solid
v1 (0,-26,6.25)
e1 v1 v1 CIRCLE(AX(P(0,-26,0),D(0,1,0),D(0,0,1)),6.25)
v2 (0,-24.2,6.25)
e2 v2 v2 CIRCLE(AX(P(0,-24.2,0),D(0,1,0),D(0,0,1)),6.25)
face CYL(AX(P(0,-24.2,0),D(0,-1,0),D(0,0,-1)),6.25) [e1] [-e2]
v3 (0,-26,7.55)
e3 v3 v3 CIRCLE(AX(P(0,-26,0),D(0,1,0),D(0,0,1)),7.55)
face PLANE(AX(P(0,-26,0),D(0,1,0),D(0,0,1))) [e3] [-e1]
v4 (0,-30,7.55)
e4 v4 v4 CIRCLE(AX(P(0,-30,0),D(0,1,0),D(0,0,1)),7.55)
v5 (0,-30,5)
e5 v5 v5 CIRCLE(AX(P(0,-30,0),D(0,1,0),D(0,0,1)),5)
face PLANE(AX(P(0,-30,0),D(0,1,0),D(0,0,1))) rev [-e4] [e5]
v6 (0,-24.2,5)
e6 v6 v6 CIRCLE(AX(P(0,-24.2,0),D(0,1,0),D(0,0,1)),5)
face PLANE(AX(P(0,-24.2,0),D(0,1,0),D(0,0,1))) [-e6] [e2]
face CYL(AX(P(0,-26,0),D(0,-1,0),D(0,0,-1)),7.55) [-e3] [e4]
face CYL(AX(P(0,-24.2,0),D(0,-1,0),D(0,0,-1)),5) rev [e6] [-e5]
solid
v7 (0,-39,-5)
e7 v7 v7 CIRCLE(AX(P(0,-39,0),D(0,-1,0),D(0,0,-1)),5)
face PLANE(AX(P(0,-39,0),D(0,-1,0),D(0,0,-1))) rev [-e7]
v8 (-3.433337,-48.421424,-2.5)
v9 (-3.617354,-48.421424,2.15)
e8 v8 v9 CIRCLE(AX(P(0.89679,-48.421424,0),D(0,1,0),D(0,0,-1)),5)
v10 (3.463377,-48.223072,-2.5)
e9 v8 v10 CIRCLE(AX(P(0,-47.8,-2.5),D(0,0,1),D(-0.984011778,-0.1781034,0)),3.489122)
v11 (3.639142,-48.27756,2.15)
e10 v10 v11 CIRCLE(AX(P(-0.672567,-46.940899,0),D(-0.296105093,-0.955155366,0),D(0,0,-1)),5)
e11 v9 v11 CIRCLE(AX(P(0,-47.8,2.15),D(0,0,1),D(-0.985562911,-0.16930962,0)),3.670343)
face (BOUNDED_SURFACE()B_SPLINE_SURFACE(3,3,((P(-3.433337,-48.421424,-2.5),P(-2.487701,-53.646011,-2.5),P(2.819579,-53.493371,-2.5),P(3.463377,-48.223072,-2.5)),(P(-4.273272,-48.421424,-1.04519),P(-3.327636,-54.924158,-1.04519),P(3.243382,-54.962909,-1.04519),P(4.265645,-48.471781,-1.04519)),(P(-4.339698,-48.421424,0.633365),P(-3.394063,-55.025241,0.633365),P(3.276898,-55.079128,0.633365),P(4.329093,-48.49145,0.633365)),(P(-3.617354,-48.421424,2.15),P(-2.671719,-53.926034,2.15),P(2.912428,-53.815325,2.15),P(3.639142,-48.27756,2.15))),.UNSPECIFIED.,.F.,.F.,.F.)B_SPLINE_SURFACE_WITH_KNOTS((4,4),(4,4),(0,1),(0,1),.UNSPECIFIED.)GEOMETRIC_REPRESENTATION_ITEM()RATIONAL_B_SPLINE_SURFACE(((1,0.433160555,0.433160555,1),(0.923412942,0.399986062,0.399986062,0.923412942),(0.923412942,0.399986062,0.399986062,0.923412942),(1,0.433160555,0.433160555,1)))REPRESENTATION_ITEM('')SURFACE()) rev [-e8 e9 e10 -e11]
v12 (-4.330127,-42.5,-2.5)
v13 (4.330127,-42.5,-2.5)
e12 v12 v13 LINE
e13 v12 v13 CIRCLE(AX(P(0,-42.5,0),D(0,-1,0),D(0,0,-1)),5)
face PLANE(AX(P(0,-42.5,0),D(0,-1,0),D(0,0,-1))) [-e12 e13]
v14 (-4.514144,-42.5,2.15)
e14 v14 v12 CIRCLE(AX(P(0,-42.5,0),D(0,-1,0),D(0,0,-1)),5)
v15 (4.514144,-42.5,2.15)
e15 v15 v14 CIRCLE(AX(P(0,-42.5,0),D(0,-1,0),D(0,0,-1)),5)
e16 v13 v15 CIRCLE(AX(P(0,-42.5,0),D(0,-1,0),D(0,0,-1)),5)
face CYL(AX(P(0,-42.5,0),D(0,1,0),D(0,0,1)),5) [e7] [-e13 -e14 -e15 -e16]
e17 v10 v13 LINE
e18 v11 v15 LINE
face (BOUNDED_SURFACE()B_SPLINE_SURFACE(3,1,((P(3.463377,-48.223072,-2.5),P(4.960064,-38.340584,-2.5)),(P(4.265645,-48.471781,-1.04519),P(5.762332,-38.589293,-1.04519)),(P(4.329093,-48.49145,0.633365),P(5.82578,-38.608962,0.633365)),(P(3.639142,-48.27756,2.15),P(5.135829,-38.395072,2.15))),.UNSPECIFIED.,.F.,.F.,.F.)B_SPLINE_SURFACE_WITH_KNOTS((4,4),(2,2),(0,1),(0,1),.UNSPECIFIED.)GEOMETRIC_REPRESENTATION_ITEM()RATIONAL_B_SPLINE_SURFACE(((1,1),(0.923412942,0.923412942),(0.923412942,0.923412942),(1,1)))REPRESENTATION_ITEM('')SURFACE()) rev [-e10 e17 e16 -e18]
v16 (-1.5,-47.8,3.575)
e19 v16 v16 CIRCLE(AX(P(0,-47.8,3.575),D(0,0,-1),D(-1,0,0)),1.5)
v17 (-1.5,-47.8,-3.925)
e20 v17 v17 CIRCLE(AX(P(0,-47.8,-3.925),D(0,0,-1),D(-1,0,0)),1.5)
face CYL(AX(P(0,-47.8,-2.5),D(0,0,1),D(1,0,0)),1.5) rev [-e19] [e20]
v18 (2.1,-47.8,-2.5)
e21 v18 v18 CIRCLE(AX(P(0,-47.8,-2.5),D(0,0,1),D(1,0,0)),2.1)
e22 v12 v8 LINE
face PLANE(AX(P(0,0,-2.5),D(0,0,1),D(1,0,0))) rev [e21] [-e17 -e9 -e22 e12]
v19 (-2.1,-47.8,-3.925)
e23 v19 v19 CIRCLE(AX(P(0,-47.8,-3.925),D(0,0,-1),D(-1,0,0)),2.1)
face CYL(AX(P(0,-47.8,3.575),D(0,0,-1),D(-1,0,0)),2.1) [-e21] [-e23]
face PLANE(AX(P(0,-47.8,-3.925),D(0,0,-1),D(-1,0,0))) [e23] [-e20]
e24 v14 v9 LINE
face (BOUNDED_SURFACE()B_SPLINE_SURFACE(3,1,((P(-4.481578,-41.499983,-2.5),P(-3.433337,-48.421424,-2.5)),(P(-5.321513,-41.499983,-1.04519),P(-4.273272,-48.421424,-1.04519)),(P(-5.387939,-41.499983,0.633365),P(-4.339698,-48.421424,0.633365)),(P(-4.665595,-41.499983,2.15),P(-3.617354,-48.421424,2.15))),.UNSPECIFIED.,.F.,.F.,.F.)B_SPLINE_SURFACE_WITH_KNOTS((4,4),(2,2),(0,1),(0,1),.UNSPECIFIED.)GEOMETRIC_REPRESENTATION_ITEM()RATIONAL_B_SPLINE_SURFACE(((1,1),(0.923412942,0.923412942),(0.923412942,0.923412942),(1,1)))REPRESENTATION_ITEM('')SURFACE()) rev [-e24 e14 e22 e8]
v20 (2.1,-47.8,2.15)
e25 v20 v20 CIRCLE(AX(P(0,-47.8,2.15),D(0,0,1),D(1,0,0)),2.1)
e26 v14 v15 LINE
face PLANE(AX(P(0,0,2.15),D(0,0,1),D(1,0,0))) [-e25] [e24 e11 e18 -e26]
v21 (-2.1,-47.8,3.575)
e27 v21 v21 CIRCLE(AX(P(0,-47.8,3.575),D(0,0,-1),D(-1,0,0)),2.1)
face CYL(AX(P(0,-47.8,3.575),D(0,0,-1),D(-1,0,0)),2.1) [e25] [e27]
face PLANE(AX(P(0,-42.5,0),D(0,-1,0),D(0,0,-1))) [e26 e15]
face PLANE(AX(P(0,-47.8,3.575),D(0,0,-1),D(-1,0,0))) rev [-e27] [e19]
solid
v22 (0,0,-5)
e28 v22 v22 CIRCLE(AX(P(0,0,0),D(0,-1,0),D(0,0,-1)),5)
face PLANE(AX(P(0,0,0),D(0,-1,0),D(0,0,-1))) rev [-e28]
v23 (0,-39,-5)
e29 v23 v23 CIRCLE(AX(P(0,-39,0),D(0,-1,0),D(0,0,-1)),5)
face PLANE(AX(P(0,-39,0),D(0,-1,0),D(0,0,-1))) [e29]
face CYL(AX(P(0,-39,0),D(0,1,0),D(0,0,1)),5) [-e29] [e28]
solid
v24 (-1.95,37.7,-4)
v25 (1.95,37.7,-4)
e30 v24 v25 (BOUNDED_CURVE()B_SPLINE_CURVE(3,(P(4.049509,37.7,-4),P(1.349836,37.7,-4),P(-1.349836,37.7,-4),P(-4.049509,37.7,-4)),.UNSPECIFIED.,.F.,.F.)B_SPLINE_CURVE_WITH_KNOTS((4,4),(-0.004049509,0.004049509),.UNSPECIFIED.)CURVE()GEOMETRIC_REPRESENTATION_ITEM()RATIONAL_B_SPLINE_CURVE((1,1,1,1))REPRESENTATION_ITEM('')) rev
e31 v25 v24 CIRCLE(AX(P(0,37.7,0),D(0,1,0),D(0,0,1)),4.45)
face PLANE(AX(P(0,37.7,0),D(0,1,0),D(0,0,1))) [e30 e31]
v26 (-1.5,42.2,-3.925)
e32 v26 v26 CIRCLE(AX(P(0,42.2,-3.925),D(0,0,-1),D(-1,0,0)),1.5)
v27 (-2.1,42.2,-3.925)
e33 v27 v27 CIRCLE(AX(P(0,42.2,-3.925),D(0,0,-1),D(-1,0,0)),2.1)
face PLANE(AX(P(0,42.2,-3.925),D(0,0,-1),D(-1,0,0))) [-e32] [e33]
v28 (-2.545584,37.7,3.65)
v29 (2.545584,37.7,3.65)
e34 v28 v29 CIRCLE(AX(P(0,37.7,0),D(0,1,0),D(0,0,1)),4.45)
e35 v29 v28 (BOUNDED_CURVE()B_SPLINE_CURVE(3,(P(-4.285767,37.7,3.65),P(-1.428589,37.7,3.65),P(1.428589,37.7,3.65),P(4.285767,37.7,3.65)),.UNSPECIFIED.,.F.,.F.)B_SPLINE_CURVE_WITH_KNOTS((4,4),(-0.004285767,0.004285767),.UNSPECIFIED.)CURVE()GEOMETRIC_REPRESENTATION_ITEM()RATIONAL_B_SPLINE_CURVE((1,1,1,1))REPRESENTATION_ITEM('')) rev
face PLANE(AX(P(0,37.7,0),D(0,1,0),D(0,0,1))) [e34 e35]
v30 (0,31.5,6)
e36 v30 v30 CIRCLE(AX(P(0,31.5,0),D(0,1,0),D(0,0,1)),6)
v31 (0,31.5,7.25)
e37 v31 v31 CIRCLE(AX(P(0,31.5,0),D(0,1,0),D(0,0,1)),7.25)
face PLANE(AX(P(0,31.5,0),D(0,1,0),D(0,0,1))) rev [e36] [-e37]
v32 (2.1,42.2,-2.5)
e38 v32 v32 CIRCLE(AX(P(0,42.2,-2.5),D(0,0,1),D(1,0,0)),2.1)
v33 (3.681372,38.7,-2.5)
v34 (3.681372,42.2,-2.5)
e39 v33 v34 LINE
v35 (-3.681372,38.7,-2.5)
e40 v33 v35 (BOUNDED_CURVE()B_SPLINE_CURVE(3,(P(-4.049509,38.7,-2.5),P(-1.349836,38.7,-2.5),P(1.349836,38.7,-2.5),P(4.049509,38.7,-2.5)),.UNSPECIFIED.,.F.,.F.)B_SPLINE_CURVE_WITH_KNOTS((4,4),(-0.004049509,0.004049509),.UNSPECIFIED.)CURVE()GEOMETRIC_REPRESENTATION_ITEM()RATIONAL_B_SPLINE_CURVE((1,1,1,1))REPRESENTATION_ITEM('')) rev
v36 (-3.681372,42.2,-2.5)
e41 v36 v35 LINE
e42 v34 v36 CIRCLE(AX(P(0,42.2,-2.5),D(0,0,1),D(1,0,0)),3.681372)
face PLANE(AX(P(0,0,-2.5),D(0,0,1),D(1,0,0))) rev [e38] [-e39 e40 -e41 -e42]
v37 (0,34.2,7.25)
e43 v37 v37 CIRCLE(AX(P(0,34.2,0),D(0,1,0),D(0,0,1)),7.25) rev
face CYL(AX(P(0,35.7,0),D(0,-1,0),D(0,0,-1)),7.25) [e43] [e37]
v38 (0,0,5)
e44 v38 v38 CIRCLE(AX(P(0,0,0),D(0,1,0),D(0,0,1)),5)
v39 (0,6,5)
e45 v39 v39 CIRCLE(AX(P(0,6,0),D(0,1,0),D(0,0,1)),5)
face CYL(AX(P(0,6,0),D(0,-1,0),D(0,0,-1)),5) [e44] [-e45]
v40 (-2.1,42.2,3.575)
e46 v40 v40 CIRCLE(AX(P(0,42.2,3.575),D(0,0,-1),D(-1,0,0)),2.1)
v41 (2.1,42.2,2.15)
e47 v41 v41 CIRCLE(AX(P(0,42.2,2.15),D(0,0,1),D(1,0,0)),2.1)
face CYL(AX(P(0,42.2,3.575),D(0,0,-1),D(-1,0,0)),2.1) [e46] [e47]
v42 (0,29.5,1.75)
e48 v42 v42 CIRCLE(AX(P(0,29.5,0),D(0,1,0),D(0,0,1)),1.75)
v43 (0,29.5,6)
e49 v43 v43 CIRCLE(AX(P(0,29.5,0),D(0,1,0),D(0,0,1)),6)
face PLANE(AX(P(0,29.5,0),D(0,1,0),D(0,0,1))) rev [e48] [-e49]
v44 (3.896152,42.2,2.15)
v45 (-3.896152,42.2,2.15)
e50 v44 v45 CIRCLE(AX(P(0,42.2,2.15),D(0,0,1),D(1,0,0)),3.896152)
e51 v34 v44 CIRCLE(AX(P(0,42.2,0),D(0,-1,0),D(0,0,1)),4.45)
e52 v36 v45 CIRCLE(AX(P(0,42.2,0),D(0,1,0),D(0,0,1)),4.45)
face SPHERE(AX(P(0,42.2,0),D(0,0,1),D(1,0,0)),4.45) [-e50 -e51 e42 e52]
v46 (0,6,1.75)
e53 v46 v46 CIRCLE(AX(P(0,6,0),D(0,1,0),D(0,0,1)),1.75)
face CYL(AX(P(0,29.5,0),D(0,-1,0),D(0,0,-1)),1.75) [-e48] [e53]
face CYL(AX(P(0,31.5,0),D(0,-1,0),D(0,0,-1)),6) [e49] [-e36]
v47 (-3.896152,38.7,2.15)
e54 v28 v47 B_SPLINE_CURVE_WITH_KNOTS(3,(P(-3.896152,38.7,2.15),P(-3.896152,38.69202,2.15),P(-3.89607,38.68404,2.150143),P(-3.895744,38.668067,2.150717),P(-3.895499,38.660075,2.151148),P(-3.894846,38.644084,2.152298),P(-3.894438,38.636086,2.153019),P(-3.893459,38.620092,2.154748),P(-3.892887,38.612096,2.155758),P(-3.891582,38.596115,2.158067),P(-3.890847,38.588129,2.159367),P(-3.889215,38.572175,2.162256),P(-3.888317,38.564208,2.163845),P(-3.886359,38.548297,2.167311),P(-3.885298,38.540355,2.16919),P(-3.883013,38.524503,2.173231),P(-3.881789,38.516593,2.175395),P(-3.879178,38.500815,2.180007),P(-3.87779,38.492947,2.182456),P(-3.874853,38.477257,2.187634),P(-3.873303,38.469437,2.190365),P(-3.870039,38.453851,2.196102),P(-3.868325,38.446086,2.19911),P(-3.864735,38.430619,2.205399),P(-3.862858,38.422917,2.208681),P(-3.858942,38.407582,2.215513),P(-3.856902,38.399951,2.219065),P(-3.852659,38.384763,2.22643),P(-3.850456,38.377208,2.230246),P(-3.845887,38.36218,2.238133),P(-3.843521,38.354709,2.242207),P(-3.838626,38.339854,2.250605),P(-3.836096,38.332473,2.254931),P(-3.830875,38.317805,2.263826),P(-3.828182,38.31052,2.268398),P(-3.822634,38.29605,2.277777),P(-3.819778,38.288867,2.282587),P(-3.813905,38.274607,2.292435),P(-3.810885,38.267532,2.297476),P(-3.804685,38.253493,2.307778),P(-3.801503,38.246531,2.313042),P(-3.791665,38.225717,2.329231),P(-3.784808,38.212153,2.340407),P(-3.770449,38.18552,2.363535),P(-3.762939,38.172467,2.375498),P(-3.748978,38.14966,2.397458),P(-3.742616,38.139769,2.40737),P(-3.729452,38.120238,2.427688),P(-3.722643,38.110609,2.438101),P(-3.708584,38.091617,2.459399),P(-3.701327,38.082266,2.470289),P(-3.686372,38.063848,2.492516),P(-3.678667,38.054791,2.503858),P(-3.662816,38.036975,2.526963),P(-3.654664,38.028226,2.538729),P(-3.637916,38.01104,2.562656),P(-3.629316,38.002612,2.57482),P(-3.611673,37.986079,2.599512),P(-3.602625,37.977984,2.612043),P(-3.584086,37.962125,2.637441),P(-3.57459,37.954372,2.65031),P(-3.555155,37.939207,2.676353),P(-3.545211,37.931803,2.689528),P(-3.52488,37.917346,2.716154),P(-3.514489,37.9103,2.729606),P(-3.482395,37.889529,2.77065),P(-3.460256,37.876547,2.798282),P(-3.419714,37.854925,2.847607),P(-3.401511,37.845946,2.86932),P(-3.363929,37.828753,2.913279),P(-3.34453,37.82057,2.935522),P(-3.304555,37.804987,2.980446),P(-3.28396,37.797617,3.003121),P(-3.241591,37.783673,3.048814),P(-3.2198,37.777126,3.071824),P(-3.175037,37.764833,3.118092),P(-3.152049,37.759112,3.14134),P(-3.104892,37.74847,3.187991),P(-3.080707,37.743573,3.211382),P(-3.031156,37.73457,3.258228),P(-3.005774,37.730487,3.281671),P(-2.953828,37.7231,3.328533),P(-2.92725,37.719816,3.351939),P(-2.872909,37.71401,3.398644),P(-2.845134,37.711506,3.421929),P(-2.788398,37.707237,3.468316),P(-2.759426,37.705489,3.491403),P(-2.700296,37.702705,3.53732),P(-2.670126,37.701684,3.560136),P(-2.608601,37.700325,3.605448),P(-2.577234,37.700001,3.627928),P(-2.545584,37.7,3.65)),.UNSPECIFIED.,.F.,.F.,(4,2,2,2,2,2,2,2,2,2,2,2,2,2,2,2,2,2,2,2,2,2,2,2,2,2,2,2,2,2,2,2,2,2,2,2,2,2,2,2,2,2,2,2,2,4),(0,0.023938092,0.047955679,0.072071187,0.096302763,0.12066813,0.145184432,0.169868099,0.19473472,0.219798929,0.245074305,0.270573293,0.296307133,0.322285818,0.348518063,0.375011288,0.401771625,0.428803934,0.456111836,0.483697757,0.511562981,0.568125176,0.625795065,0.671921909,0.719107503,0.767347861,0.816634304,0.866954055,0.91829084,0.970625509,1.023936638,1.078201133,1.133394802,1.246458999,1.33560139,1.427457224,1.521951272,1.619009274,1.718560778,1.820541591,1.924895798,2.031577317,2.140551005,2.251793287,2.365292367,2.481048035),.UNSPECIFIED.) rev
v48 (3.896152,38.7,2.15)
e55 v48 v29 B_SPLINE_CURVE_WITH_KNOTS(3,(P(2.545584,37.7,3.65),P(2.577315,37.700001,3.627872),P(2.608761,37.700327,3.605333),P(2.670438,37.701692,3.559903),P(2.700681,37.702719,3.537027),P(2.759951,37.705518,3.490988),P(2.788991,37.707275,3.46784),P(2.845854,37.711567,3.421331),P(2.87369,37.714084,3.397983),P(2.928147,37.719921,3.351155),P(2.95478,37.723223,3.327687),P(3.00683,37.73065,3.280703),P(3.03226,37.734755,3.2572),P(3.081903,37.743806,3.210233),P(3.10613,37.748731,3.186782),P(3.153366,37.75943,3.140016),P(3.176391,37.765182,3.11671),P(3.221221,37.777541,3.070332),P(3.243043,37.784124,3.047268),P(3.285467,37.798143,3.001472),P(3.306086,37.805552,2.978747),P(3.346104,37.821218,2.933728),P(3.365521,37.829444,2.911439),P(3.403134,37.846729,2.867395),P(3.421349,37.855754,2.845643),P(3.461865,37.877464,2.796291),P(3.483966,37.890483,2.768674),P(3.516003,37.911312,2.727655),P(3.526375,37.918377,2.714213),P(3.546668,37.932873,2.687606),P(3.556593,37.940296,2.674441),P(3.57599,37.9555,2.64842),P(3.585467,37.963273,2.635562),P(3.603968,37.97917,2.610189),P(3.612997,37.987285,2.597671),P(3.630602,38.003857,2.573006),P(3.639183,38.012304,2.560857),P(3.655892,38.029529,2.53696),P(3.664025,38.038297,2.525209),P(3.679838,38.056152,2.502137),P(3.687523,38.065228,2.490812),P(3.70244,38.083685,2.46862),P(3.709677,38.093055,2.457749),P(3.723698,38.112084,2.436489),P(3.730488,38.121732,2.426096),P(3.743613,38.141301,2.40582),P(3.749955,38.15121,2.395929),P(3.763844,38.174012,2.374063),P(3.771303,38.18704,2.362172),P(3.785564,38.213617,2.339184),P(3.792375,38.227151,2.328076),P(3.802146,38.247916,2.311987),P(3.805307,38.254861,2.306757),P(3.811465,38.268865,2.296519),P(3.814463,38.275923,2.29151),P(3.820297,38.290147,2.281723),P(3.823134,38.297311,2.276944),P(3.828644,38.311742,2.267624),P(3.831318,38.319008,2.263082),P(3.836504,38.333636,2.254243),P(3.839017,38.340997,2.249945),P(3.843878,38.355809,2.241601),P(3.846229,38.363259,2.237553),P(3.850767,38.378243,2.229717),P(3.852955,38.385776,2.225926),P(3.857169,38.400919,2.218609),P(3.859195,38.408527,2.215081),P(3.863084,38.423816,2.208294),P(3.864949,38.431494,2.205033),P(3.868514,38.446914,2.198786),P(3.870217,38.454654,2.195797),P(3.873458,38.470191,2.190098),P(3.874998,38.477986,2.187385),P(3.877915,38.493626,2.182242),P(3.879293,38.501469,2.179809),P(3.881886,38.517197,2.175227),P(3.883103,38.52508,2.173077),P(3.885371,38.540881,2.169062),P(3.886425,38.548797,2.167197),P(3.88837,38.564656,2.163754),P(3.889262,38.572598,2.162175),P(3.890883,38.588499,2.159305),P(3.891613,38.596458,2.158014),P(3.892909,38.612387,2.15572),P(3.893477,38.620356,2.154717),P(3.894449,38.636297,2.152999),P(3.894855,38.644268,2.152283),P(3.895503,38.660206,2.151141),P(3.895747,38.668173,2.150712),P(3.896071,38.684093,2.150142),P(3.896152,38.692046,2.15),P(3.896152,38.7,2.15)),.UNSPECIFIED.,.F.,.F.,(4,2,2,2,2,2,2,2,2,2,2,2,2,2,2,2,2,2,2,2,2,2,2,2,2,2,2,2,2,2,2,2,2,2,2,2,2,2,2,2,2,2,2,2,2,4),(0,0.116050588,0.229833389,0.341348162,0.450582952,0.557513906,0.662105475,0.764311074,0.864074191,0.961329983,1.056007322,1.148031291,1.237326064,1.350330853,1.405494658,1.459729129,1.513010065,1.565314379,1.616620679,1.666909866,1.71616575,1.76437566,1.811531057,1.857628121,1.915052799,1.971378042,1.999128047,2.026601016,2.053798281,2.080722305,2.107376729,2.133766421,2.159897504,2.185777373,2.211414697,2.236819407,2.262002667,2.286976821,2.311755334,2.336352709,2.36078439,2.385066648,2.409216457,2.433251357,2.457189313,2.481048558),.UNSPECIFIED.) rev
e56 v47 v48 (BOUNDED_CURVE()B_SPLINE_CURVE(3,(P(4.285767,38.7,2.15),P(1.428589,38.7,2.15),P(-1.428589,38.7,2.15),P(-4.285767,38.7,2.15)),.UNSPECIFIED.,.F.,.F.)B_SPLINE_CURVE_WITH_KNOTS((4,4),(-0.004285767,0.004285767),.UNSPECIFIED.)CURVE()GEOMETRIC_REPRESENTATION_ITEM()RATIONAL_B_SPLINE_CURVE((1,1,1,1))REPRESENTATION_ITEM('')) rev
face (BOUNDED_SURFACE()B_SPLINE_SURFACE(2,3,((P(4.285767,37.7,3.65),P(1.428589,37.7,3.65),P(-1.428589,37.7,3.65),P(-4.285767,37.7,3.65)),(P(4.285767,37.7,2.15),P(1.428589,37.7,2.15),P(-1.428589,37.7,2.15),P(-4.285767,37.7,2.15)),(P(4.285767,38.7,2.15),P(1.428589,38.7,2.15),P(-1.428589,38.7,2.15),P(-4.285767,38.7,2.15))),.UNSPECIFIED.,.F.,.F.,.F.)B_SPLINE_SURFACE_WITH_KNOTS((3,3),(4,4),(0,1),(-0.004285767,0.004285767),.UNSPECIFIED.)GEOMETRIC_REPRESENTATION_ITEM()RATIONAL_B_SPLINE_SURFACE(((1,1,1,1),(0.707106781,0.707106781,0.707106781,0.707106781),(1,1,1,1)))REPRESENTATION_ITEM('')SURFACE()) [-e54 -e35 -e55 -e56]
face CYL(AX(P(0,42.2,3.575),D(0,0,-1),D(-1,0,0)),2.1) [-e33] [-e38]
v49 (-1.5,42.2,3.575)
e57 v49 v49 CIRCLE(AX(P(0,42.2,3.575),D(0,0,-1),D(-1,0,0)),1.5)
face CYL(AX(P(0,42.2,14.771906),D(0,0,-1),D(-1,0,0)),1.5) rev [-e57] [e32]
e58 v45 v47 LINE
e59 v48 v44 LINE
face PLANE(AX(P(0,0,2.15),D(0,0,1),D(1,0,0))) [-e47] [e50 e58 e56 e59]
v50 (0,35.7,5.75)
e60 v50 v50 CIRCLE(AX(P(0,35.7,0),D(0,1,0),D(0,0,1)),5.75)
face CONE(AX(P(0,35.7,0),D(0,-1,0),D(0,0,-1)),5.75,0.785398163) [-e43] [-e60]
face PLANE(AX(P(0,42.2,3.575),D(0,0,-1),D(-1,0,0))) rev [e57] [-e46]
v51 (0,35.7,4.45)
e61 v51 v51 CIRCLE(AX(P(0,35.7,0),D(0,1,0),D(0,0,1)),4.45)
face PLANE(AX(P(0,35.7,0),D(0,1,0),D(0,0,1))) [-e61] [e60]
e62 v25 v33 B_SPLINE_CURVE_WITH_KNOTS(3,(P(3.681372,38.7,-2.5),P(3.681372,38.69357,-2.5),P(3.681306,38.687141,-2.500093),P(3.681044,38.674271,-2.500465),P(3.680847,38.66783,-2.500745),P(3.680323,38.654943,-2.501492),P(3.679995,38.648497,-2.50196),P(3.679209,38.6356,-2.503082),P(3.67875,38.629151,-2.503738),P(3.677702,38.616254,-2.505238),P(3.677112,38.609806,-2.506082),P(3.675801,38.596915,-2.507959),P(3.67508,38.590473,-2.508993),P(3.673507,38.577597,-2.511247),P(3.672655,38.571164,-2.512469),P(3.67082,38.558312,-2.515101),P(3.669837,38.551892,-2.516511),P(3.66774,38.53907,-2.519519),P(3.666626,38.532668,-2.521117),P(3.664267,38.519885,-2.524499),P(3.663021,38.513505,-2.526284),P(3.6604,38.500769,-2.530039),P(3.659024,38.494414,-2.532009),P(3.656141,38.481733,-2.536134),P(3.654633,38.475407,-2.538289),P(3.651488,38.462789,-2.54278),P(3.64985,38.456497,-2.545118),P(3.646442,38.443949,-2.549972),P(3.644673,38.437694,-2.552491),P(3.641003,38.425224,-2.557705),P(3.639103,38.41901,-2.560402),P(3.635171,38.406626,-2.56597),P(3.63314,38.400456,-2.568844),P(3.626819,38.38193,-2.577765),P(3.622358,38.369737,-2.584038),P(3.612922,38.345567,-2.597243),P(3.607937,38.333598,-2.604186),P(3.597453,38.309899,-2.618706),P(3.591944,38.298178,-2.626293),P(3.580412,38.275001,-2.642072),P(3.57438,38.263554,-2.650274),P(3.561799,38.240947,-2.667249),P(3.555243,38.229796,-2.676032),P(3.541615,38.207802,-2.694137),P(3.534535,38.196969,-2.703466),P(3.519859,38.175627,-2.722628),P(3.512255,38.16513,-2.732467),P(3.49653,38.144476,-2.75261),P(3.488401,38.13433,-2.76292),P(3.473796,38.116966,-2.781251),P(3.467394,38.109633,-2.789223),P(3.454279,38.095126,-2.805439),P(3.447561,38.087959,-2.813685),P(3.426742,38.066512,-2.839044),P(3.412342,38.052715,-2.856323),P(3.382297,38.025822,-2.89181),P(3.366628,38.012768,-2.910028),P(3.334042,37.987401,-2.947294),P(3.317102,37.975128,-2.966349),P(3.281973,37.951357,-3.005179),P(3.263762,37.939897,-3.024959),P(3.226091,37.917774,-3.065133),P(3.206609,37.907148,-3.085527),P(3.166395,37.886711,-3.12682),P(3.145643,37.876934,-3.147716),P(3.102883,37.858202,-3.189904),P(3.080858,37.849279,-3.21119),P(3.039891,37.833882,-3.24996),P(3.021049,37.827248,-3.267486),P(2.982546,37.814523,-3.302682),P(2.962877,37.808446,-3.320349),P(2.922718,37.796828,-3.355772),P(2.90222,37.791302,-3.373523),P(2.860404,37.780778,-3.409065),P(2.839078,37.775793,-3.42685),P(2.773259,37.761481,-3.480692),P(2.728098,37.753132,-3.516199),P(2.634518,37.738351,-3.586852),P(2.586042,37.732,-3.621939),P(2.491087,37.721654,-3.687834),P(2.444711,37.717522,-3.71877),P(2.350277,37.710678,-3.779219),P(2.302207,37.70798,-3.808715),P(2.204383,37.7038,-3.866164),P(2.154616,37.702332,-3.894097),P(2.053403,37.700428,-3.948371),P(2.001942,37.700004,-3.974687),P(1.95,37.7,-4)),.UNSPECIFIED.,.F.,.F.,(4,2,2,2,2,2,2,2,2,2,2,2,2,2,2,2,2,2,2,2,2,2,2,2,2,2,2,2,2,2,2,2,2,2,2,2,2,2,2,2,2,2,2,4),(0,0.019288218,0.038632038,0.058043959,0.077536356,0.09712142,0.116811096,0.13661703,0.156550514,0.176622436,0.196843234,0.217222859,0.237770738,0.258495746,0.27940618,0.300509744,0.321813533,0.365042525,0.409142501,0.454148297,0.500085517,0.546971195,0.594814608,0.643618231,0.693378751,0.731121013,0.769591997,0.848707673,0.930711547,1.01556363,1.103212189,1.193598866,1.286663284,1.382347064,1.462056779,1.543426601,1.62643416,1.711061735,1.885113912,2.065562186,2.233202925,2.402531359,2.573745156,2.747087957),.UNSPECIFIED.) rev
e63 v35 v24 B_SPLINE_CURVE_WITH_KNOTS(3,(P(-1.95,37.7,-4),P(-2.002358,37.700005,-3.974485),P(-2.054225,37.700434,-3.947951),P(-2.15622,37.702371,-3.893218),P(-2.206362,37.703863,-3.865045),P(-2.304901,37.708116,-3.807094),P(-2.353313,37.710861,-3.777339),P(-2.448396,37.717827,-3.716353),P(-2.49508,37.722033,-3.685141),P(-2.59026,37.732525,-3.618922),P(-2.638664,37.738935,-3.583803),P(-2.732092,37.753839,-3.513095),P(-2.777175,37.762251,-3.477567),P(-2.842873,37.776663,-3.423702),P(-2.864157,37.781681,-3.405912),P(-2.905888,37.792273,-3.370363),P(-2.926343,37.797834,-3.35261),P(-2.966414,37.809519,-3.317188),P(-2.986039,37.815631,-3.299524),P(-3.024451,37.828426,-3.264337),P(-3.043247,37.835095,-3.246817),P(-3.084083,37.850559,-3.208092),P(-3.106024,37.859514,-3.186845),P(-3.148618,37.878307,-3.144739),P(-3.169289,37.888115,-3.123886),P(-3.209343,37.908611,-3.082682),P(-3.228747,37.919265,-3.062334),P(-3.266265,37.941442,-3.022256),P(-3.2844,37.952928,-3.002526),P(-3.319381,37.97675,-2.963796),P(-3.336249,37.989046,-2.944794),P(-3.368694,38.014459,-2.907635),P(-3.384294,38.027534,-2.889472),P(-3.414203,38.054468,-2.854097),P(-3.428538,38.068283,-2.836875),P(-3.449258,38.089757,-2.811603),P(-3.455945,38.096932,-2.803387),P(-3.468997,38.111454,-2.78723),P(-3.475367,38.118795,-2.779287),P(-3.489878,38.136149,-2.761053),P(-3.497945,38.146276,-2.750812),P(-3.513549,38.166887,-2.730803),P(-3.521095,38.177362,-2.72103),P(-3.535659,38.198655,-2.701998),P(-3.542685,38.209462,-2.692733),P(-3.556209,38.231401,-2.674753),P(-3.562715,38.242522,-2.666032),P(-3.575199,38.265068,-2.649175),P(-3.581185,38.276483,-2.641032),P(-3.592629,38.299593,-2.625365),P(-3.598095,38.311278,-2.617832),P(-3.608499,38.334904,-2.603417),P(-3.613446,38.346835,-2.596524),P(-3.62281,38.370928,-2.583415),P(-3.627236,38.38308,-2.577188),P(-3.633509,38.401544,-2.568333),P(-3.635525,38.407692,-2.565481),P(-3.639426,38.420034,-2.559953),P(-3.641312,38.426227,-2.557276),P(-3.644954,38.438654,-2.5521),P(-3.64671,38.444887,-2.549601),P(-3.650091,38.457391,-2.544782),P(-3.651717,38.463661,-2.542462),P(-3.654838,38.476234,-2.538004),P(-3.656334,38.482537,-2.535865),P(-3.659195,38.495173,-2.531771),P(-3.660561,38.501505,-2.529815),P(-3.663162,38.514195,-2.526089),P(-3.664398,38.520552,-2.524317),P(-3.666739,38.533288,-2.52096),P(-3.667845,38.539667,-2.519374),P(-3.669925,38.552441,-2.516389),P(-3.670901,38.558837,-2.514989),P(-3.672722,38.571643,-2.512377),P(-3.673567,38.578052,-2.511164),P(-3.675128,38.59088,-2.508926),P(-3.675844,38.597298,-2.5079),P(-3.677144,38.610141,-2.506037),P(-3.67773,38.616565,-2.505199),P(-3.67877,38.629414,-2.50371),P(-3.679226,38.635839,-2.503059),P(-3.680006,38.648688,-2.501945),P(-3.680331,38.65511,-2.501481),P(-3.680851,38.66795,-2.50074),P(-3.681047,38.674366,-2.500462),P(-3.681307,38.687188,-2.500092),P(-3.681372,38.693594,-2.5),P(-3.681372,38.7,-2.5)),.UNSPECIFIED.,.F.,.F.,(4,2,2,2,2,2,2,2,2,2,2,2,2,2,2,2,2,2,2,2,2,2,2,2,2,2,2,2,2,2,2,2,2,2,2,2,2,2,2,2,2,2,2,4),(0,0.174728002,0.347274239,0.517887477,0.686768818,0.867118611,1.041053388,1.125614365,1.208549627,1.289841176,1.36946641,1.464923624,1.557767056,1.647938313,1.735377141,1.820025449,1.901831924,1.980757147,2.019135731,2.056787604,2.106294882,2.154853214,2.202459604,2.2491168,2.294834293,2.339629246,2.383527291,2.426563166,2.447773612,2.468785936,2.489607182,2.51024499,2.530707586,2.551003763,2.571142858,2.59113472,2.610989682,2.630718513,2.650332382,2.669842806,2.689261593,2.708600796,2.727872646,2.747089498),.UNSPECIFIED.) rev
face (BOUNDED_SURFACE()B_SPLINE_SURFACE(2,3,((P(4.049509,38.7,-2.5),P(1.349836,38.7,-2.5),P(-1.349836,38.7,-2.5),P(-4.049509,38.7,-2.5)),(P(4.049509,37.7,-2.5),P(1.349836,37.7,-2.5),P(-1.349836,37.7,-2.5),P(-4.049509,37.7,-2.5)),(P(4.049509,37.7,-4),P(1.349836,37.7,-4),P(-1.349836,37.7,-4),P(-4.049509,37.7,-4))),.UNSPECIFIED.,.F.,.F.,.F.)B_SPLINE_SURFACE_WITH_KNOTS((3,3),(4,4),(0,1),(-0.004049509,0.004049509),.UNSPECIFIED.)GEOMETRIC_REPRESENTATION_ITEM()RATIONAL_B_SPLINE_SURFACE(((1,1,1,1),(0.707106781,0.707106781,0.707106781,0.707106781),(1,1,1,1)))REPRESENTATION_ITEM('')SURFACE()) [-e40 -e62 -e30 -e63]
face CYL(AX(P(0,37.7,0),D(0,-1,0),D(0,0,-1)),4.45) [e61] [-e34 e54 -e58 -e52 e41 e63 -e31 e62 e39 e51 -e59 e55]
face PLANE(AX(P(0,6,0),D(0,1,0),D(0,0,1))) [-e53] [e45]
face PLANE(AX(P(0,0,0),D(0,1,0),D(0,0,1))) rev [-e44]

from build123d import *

# Parameters (mm, degrees)
SKETCH1_R                 = 5
BOSS_EXTRUDE1_DEPTH       = 6
SKETCH2_R                 = 5
BOSS_EXTRUDE2_DEPTH       = 39
SKETCH3_R                 = 5
BOSS_EXTRUDE3_DEPTH       = 3.5
BOSS_EXTRUDE4_DEPTH       = 2.15
BOSS_EXTRUDE4_DEPTH_BACK  = 2.5
SKETCH4_R                 = 1.5
SKETCH7_R                 = 1.75
BOSS_EXTRUDE5_DEPTH       = 23.5
SKETCH8_R                 = 6
BOSS_EXTRUDE6_DEPTH       = 2
SKETCH9_R                 = 7.25
BOSS_EXTRUDE7_DEPTH       = 4.2
SKETCH10_R                = 4.45
BOSS_EXTRUDE8_DEPTH       = 2
BOSS_EXTRUDE9_START       = -2.5
BOSS_EXTRUDE9_OUTLINE_R   = 1.5
BOSS_EXTRUDE9_DEPTH       = 4.65
CHAMFER1_SIZE             = 1.5
SKETCH14_R                = 7.55
SKETCH14_R_2              = 5
BOSS_EXTRUDE10_DEPTH      = 4
SKETCH15_R                = 6.25
SKETCH15_R_2              = 5
BOSS_EXTRUDE11_DEPTH      = 1.8
FILLET1_SIZE              = 1.5
FILLET1_SIZE_2            = 1
BOSS_EXTRUDE12_DEPTH      = 1.425
BOSS_EXTRUDE12_DEPTH_BACK = 6.075
SKETCH16_R                = 2.1
SKETCH16_R_2              = 1.5


# Read off the part's stored shape, not the designer's step: Boss-Extrude9
with BuildPart() as part:
    # Sketch1 → Boss-Extrude1 (new body)
    with BuildSketch(Plane(origin=(0, 0, 0), x_dir=(1, 0, 0), z_dir=(0, 1, 0))):
        with Locations(Location((0, 0, 0), (0, 0, 270))):
            Circle(SKETCH1_R)
    extrude(amount=BOSS_EXTRUDE1_DEPTH)

    # Sketch7 → Boss-Extrude5 (add)
    with BuildSketch(Plane(origin=(0, 6, 0), x_dir=(1, 0, 0), z_dir=(0, 1, 0))):
        with Locations(Location((0, 0, 0), (0, 0, 270))):
            Circle(SKETCH7_R)
    extrude(amount=BOSS_EXTRUDE5_DEPTH)

    # Sketch8 → Boss-Extrude6 (add)
    with BuildSketch(Plane(origin=(0, 29.5, 0), x_dir=(1, 0, 0), z_dir=(0, 1, 0))):
        with Locations(Location((0, 0, 0), (0, 0, 270))):
            Circle(SKETCH8_R)
    extrude(amount=BOSS_EXTRUDE6_DEPTH)

    # Sketch9 → Boss-Extrude7 (add)
    with BuildSketch(Plane(origin=(0, 31.5, 0), x_dir=(1, 0, 0), z_dir=(0, 1, 0))):
        with Locations(Location((0, 0, 0), (0, 0, 270))):
            Circle(SKETCH9_R)
    extrude(amount=BOSS_EXTRUDE7_DEPTH)

    # Sketch10 → Boss-Extrude8 (add)
    with BuildSketch(Plane(origin=(0, 35.7, 0), x_dir=(1, 0, 0), z_dir=(0, 1, 0))):
        with Locations(Location((0, 0, 0), (0, 0, 270))):
            Circle(SKETCH10_R)
    extrude(amount=BOSS_EXTRUDE8_DEPTH)

    # Boss-Extrude9 outline → Boss-Extrude9 (add)
    with BuildSketch(Plane.XY.offset(BOSS_EXTRUDE9_START)):
        with BuildLine():
            Line((-4.45, 37.7), (4.45, 37.7))
            Line((4.45, 37.7), (4.45, 42.2))
            ThreePointArc((4.45, 42.2), (0, 46.65), (-4.45, 42.2))
            Line((-4.45, 42.2), (-4.45, 37.7))
        make_face()
        with Locations((0, 42.2)):
            Circle(BOSS_EXTRUDE9_OUTLINE_R, mode=Mode.SUBTRACT)
    extrude(amount=BOSS_EXTRUDE9_DEPTH)

    # Cut-Sweep2: sweep along a path in Sketch13
    with BuildLine(Plane.XY.offset(2.15)) as cut_sweep2_path:
        Line((4.45, 37.7), (4.45, 42.2))
        ThreePointArc((4.45, 42.2), (0, 46.65), (-4.45, 42.2))
        Line((-4.45, 42.2), (-4.45, 37.7))
    # Sketch12 → Cut-Sweep2 (sweep, cut)
    with BuildSketch(Plane(origin=(0, 37.7, 0), x_dir=(1, 0, 0), z_dir=(0, 1, 0))):
        with BuildLine():
            Line((3.681372027, 2.5), (12.756673054, 2.5))
            Line((12.756673054, 2.5), (12.756673054, -2.15))
            Line((12.756673054, -2.15), (3.896151948, -2.15))
            ThreePointArc((3.896151948, -2.15), (4.445260667, 0.205323169), (3.681372027, 2.5))
        make_face()
    sweep(path=cut_sweep2_path.line, mode=Mode.SUBTRACT)

    # Chamfer1
    chamfer1_edges = [part.edges().sort_by_distance(p)[0] for p in [
        (0, 35.7, -7.25),
    ]]
    chamfer(chamfer1_edges, length=CHAMFER1_SIZE)

    # Fillet1
    # an asymmetric fillet: 1.5, 1 mm, written as the material it adds along each edge
    with BuildSketch(Plane(origin=(-7.646151948, 37.7, 2.15), x_dir=(0, 0, 1), z_dir=(1, 0, 0))) as fillet1_piece_1_section:
        with BuildLine():
            Bezier((FILLET1_SIZE, 0), (0, 0), (0, -FILLET1_SIZE_2), weights=[1, 0.707106781, 1])
            Line((0, -FILLET1_SIZE_2), (0, 0))
            Line((0, 0), (FILLET1_SIZE, 0))
        make_face()
    fillet1_piece_1 = extrude(amount=15.292303896, mode=Mode.PRIVATE)
    fillet1_piece_1 = fillet1_piece_1 & Plane(origin=(0, 37.925469926, 0), x_dir=(0, 0, 1), z_dir=(0, -1, 0)) * Cylinder(4.45, 37, mode=Mode.PRIVATE)
    add(fillet1_piece_1)
    with BuildSketch(Plane(origin=(-7.431372027, 37.7, -2.5), x_dir=(0, 0, -1), z_dir=(1, 0, 0))) as fillet1_piece_2_section:
        with BuildLine():
            Bezier((FILLET1_SIZE, 0), (0, 0), (0, FILLET1_SIZE_2), weights=[1, 0.707106781, 1])
            Line((0, FILLET1_SIZE_2), (0, 0))
            Line((0, 0), (FILLET1_SIZE, 0))
        make_face()
    fillet1_piece_2 = extrude(amount=14.862744054, mode=Mode.PRIVATE)
    fillet1_piece_2 = fillet1_piece_2 & Plane(origin=(0, 37.928455835, 0), x_dir=(0, 0, 1), z_dir=(0, -1, 0)) * Cylinder(4.45, 36, mode=Mode.PRIVATE)
    add(fillet1_piece_2)



with BuildPart() as body_2:
    # Sketch2 → Boss-Extrude2 (new body)
    with BuildSketch(Plane.XZ):
        with Locations(Location((0, 0, 0), (0, 0, 270))):
            Circle(SKETCH2_R)
    extrude(amount=BOSS_EXTRUDE2_DEPTH)


with BuildPart() as body_3:
    # Sketch3 → Boss-Extrude3 (new body)
    with BuildSketch(Plane.XZ.offset(39)):
        with Locations(Location((0, 0, 0), (0, 0, 270))):
            Circle(SKETCH3_R)
    extrude(amount=BOSS_EXTRUDE3_DEPTH)

    # Sketch4 → Boss-Extrude4 (add, two sides: drawn at the far end of the back side and taken through both)
    with BuildSketch(Plane.XY.offset(-BOSS_EXTRUDE4_DEPTH_BACK)):
        with BuildLine():
            Line((5, -42.5), (-5, -42.5))
            Line((-5, -42.5), (-4.10320992, -48.421424453))
            ThreePointArc((-4.10320992, -48.421424453), (1.7e-08, -51.95), (4.103209925, -48.421424419))
            Line((4.103209925, -48.421424419), (5, -42.5))
        make_face()
        with Locations((0, -47.8)):
            Circle(SKETCH4_R, mode=Mode.SUBTRACT)
    extrude(amount=BOSS_EXTRUDE4_DEPTH + BOSS_EXTRUDE4_DEPTH_BACK)

    # Cut-Sweep1: sweep along a path in Sketch6
    with BuildLine(Plane(origin=(0, 0, -2.5), x_dir=(-1, 0, 0), z_dir=(0, 0, -1))) as cut_sweep1_path:
        Line((-5, -42.5), (-4.10320992, -48.421424453))
        ThreePointArc((-4.10320992, -48.421424453), (0, -51.95), (4.10320992, -48.421424453))
        Line((4.10320992, -48.421424453), (5, -42.5))
    # Sketch5 → Cut-Sweep1 (sweep, cut)
    with BuildSketch(Plane.XZ.offset(42.5)):
        with BuildLine():
            Line((-4.514144437, 2.15), (-14.845117042, 2.15))
            ThreePointArc((-14.845117042, 2.15), (-14.998953997, -0.177141145), (-14.790199458, -2.5))
            Line((-14.790199458, -2.5), (-4.330127019, -2.5))
            ThreePointArc((-4.330127019, -2.5), (-4.99608941, -0.197713435), (-4.514144437, 2.15))
        make_face()
    sweep(path=cut_sweep1_path.line, mode=Mode.SUBTRACT)


with BuildPart() as body_4:
    # Sketch14 → Boss-Extrude10 (new body)
    with BuildSketch(Plane(origin=(0, -30, 0), x_dir=(1, 0, 0), z_dir=(0, 1, 0))):
        with Locations(Location((0, 0, 0), (0, 0, 270))):
            Circle(SKETCH14_R)
        with Locations(Location((0, 0, 0), (0, 0, 205.467560142))):
            Circle(SKETCH14_R_2, mode=Mode.SUBTRACT)
    extrude(amount=BOSS_EXTRUDE10_DEPTH)


with BuildPart() as body_5:
    # Sketch15 → Boss-Extrude11 (new body)
    with BuildSketch(Plane(origin=(0, -26, 0), x_dir=(1, 0, 0), z_dir=(0, 1, 0))):
        with Locations(Location((0, 0, 0), (0, 0, 270))):
            Circle(SKETCH15_R)
        with Locations(Location((0, 0, 0), (0, 0, 205.467560142))):
            Circle(SKETCH15_R_2, mode=Mode.SUBTRACT)
    extrude(amount=BOSS_EXTRUDE11_DEPTH)

    # Combine1: union body 4
    add(body_4.part)


with BuildPart() as part_1:
    add(part.part)

    add(body_3.part)  # Boss-Extrude12 merges body 3
    # Sketch16 → Boss-Extrude12 (add, two sides: drawn at the far end of the back side and taken through both)
    # profile 1 of 2: a face of its own
    with BuildSketch(Plane(origin=(0, 0, -2.5), x_dir=(-1, 0, 0), z_dir=(0, 0, -1)).offset(-BOSS_EXTRUDE12_DEPTH_BACK)):
        with Locations((0, 42.2)):
            Circle(SKETCH16_R)
        with Locations((0, 42.2)):
            Circle(SKETCH16_R_2, mode=Mode.SUBTRACT)
    # profile 2 of 2: a face of its own
    with BuildSketch(Plane(origin=(0, 0, -2.5), x_dir=(-1, 0, 0), z_dir=(0, 0, -1)).offset(-BOSS_EXTRUDE12_DEPTH_BACK)):
        with Locations((0, -47.8)):
            Circle(SKETCH16_R)
        with Locations((0, -47.8)):
            Circle(SKETCH16_R_2, mode=Mode.SUBTRACT)
    extrude(amount=BOSS_EXTRUDE12_DEPTH + BOSS_EXTRUDE12_DEPTH_BACK)


solid = Compound([body_2.part, body_5.part, part_1.part])
